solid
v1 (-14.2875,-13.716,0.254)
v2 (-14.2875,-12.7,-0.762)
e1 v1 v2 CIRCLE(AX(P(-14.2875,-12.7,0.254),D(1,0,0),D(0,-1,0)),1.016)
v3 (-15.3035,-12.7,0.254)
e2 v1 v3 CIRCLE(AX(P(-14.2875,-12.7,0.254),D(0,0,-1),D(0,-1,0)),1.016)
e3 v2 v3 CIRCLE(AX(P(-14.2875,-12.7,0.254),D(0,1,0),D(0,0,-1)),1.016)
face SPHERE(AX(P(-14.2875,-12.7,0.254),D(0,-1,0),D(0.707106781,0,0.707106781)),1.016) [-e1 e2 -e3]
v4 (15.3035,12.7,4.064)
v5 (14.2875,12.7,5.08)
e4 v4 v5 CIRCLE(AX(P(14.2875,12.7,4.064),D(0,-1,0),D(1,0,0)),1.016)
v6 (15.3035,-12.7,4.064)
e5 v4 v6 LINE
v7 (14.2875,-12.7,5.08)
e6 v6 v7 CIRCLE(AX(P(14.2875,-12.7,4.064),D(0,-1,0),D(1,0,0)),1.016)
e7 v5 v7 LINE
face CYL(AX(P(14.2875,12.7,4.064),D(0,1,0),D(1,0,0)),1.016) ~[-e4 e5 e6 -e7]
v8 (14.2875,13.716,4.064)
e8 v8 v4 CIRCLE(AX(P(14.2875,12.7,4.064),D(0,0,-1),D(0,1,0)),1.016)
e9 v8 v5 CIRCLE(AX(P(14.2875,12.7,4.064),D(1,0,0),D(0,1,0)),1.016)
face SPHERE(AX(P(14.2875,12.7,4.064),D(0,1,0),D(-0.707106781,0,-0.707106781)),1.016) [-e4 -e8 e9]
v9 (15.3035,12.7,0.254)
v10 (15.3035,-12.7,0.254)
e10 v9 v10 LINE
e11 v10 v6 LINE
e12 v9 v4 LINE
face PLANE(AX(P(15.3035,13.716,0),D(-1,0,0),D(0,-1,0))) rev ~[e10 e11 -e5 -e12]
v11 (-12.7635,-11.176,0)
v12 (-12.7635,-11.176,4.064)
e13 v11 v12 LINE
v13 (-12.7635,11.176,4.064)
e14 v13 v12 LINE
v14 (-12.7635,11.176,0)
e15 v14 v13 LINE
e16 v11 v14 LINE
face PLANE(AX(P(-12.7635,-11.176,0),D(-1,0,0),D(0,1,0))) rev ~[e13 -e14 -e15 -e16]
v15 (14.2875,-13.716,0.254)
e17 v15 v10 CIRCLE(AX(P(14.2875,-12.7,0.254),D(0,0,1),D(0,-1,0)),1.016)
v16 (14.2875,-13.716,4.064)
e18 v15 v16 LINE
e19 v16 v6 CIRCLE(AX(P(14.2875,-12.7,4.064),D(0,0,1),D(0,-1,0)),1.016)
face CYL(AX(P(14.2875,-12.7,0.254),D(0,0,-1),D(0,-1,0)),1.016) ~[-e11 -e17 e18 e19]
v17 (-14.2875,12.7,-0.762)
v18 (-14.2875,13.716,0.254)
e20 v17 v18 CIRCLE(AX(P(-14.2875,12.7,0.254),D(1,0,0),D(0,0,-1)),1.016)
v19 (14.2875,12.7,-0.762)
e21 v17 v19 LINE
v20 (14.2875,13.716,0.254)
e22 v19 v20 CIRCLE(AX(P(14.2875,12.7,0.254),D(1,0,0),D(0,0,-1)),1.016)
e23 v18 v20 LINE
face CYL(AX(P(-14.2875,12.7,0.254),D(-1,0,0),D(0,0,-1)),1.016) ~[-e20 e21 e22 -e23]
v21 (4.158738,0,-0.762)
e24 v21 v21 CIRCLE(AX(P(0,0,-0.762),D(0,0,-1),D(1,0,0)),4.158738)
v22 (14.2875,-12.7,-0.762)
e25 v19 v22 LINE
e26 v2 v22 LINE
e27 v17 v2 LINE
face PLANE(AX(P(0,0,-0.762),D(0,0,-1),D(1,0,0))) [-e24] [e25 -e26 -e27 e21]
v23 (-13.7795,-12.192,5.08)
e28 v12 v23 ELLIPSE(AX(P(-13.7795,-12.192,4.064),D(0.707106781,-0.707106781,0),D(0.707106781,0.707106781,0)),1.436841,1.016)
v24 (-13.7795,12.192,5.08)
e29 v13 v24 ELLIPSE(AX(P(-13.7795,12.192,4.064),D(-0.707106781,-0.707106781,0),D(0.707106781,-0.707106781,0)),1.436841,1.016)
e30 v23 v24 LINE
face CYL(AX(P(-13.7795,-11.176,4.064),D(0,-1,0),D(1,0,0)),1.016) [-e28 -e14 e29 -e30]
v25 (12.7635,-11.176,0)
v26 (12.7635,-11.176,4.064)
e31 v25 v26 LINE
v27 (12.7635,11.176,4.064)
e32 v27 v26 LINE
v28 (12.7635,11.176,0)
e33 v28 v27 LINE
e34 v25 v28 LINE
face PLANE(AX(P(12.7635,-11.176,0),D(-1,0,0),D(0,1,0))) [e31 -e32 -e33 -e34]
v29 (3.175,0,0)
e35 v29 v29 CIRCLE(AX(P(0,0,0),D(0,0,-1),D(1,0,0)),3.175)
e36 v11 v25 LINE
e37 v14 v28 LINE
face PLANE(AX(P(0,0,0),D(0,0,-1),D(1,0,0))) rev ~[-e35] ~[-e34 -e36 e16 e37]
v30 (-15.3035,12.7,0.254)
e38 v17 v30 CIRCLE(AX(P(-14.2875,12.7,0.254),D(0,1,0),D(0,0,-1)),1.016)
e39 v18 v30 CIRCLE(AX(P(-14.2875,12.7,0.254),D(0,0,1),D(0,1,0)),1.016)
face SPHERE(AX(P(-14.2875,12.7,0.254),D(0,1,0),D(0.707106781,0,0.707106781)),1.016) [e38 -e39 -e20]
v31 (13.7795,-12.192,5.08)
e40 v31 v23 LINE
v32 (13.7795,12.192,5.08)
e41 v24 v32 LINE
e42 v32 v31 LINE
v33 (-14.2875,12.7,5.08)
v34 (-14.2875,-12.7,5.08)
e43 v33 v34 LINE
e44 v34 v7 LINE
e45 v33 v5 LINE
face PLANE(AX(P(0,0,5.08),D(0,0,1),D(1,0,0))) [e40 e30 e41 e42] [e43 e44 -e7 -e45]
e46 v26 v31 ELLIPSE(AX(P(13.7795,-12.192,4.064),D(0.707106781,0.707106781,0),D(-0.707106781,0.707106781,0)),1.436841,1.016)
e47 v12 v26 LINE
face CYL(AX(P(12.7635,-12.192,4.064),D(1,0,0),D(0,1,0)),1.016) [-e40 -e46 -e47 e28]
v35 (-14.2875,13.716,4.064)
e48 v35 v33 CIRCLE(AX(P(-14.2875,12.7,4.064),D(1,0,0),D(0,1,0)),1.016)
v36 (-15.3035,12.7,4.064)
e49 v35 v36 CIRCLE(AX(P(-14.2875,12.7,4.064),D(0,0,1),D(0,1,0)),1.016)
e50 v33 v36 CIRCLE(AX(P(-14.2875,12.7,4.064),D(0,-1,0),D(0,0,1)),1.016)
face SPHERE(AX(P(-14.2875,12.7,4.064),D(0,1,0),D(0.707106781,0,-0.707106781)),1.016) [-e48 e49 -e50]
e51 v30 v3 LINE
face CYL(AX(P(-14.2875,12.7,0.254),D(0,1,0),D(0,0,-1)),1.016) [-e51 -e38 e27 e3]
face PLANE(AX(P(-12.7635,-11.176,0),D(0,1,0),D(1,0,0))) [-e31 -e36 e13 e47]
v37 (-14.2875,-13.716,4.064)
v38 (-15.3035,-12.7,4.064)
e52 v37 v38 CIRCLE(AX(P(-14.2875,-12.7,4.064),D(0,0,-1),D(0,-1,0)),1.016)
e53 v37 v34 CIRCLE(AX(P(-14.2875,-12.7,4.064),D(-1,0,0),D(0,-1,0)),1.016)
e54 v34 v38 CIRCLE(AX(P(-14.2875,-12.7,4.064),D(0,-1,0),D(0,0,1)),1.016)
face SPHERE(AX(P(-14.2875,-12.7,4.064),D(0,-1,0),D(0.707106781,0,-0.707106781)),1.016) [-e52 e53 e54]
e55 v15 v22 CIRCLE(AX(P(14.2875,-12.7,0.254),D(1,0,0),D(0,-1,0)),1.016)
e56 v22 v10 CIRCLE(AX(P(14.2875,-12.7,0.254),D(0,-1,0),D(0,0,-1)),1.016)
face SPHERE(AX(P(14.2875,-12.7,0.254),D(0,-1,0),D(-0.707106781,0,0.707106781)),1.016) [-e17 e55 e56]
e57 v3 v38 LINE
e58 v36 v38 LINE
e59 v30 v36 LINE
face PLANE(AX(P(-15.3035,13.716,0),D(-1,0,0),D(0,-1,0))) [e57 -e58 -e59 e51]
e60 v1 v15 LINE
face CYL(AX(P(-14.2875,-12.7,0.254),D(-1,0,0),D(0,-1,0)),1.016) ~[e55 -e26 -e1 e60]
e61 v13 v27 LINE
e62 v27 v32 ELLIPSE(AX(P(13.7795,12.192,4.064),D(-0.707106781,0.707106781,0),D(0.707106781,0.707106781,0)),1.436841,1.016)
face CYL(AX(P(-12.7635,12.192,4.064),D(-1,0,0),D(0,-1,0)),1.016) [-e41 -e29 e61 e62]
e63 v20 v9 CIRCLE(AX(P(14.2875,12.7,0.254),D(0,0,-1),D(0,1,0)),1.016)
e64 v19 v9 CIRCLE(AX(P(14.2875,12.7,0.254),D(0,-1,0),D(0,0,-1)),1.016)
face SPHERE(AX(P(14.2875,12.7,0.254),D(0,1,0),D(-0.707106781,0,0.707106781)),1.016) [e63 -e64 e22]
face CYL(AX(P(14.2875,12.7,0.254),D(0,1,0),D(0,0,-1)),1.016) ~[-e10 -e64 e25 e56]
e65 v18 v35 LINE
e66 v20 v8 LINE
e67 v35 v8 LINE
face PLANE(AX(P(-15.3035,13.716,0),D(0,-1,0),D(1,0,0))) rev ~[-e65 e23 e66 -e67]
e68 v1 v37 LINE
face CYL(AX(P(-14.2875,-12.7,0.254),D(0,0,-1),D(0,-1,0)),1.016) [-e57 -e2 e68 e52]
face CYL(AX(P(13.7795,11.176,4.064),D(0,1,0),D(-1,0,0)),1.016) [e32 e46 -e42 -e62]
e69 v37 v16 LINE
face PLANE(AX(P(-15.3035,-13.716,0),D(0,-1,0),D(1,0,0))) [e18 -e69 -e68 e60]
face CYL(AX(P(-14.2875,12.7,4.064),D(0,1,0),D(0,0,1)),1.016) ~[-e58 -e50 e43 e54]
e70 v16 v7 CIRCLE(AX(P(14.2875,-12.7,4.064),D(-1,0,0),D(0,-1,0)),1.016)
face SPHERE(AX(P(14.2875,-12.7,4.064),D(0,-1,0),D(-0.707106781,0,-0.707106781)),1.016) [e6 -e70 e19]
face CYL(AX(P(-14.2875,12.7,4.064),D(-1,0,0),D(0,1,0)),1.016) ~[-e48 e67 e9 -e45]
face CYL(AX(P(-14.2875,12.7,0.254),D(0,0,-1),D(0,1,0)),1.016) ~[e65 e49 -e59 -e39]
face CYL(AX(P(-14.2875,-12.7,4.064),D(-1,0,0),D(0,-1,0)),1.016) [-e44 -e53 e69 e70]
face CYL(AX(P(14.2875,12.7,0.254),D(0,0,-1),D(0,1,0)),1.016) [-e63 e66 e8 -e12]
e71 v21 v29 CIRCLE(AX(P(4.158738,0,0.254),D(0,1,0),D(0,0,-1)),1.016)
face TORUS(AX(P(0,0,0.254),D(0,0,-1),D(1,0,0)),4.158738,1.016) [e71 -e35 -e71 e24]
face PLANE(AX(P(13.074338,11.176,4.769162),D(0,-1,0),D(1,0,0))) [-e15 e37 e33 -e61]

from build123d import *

# Parameters (mm, degrees)
F0_W          = 30.607
F0_H          = 27.432
F0_W_2        = 25.527
F0_H_2        = 22.352
F1_DEPTH      = 5.08
F2_W          = 30.607
F2_H          = 27.432
F2_R          = 3.175
F3_DEPTH      = 0.762
F4_T1_DEPTH   = 3.81
F4_T3_DEPTH   = 28.575
F4_T5_DEPTH   = 25.4
F4_T7_DEPTH   = 22.352
F4_T9_DEPTH   = 25.527
F4_S13_W      = 1.03632
F4_S13_H      = 1.03632
F4_T14_DEPTH  = 1.03632
F4_S19_W      = 1.03632
F4_S19_H      = 1.03632
F4_T20_DEPTH  = 1.03632
F4_S25_W      = 1.03632
F4_S25_H      = 1.03632
F4_T26_DEPTH  = 1.03632
F4_S31_W      = 1.03632
F4_S31_H      = 1.03632
F4_T32_DEPTH  = 1.03632
F4_S37_W      = 1.03632
F4_S37_H      = 1.03632
F4_T38_DEPTH  = 1.03632
F4_S43_W      = 1.03632
F4_S43_H      = 1.03632
F4_T44_DEPTH  = 1.03632
F4_S49_W      = 1.03632
F4_S49_H      = 1.03632
F4_T50_DEPTH  = 1.03632
F4_S55_W      = 1.03632
F4_S55_H      = 1.03632
F4_T56_DEPTH  = 1.03632
F4_T65_DEPTH  = 28.067
F4_T69_DEPTH  = 24.892
F4_T76_DEPTH  = 24.892
F4_T80_DEPTH  = 28.067
F4_T87_DEPTH  = 24.892
F4_T91_DEPTH  = 28.067
F4_T98_DEPTH  = 24.892
F4_T102_DEPTH = 28.067


# Not quite as in the source:
# - a fillet or chamfer that OpenCascade refuses, or shapes differently, is made with other operations: its cross-section is extruded or revolved along the edge and cut away or added


with BuildPart() as f1:
    # F0 (on Top) → F1 (new body)
    with BuildSketch(Plane.XY):
        Rectangle(F0_W, F0_H)
        Rectangle(F0_W_2, F0_H_2, mode=Mode.SUBTRACT)
    extrude(amount=F1_DEPTH)

    # F2 (on face) → F3 (join)
    with BuildSketch(Plane(origin=(0, 0, 0), x_dir=(1, 0, 0), z_dir=(0, 0, -1))):
        Rectangle(F2_W, F2_H)
        Circle(F2_R, mode=Mode.SUBTRACT)
    extrude(amount=F3_DEPTH)

    # F4: fillet of radius 1.016 on 17 edges, made by hand

    # F4_s2 → F4_t1 (cut)
    with BuildSketch(Plane.XY.offset(0.254)):
        with BuildLine():
            ThreePointArc((-14.2875, -13.716), (-15.0059204897, -13.4184204897), (-15.3035, -12.7))
            Line((-15.3035, -12.7), (-15.3035, -13.716))
            Line((-15.3035, -13.716), (-14.2875, -13.716))
        make_face()
        with BuildLine():
            ThreePointArc((14.2875, -13.716), (15.0059204897, -13.4184204897), (15.3035, -12.7))
            Line((15.3035, -12.7), (15.3035, -13.716))
            Line((15.3035, -13.716), (14.2875, -13.716))
        make_face()
        with BuildLine():
            ThreePointArc((-14.2875, 13.716), (-15.0059204897, 13.4184204897), (-15.3035, 12.7))
            Line((-15.3035, 12.7), (-15.3035, 13.716))
            Line((-15.3035, 13.716), (-14.2875, 13.716))
        make_face()
        with BuildLine():
            ThreePointArc((14.2875, 13.716), (15.0059204897, 13.4184204897), (15.3035, 12.7))
            Line((15.3035, 12.7), (15.3035, 13.716))
            Line((15.3035, 13.716), (14.2875, 13.716))
        make_face()
    extrude(amount=F4_T1_DEPTH, mode=Mode.SUBTRACT)

    # F4_s4 → F4_t3 (cut)
    with BuildSketch(Plane.YZ.offset(-14.2875)):
        with BuildLine():
            ThreePointArc((-13.716, 4.064), (-13.4184204897, 4.7824204897), (-12.7, 5.08))
            Line((-12.7, 5.08), (-13.716, 5.08))
            Line((-13.716, 5.08), (-13.716, 4.064))
        make_face()
        with BuildLine():
            ThreePointArc((-13.716, 0.254), (-13.4184204897, -0.4644204897), (-12.7, -0.762))
            Line((-12.7, -0.762), (-13.716, -0.762))
            Line((-13.716, -0.762), (-13.716, 0.254))
        make_face()
        with BuildLine():
            ThreePointArc((12.7, -0.762), (13.4184204897, -0.4644204897), (13.716, 0.254))
            Line((13.716, 0.254), (13.716, -0.762))
            Line((13.716, -0.762), (12.7, -0.762))
        make_face()
        with BuildLine():
            ThreePointArc((13.716, 4.064), (13.4184204897, 4.7824204897), (12.7, 5.08))
            Line((12.7, 5.08), (13.716, 5.08))
            Line((13.716, 5.08), (13.716, 4.064))
        make_face()
    extrude(amount=F4_T3_DEPTH, mode=Mode.SUBTRACT)

    # F4_s6 → F4_t5 (cut)
    with BuildSketch(Plane.XZ.offset(-12.7)):
        with BuildLine():
            ThreePointArc((-14.2875, -0.762), (-15.0059204897, -0.4644204897), (-15.3035, 0.254))
            Line((-15.3035, 0.254), (-15.3035, -0.762))
            Line((-15.3035, -0.762), (-14.2875, -0.762))
        make_face()
        with BuildLine():
            ThreePointArc((14.2875, -0.762), (15.0059204897, -0.4644204897), (15.3035, 0.254))
            Line((15.3035, 0.254), (15.3035, -0.762))
            Line((15.3035, -0.762), (14.2875, -0.762))
        make_face()
        with BuildLine():
            ThreePointArc((-14.2875, 5.08), (-15.0059204897, 4.7824204897), (-15.3035, 4.064))
            Line((-15.3035, 4.064), (-15.3035, 5.08))
            Line((-15.3035, 5.08), (-14.2875, 5.08))
        make_face()
        with BuildLine():
            ThreePointArc((15.3035, 4.064), (15.0059204897, 4.7824204897), (14.2875, 5.08))
            Line((14.2875, 5.08), (15.3035, 5.08))
            Line((15.3035, 5.08), (15.3035, 4.064))
        make_face()
    extrude(amount=F4_T5_DEPTH, mode=Mode.SUBTRACT)

    # F4_s8 → F4_t7 (cut)
    with BuildSketch(Plane.XZ.offset(-11.176)):
        with BuildLine():
            ThreePointArc((-12.7635, 4.064), (-13.0610795103, 4.7824204897), (-13.7795, 5.08))
            Line((-13.7795, 5.08), (-12.7635, 5.08))
            Line((-12.7635, 5.08), (-12.7635, 4.064))
        make_face()
        with BuildLine():
            ThreePointArc((12.7635, 4.064), (13.0610795103, 4.7824204897), (13.7795, 5.08))
            Line((13.7795, 5.08), (12.7635, 5.08))
            Line((12.7635, 5.08), (12.7635, 4.064))
        make_face()
    extrude(amount=F4_T7_DEPTH, mode=Mode.SUBTRACT)

    # F4_s10 → F4_t9 (cut)
    with BuildSketch(Plane.YZ.offset(-12.7635)):
        with BuildLine():
            ThreePointArc((11.176, 4.064), (11.4735795103, 4.7824204897), (12.192, 5.08))
            Line((12.192, 5.08), (11.176, 5.08))
            Line((11.176, 5.08), (11.176, 4.064))
        make_face()
        with BuildLine():
            ThreePointArc((-11.176, 4.064), (-11.4735795103, 4.7824204897), (-12.192, 5.08))
            Line((-12.192, 5.08), (-11.176, 5.08))
            Line((-11.176, 5.08), (-11.176, 4.064))
        make_face()
    extrude(amount=F4_T9_DEPTH, mode=Mode.SUBTRACT)


with BuildPart() as f4_tool12:
    # F4_s13 → F4_t14 (new body)
    with BuildSketch(Plane.XZ.offset(12.7)):
        with Locations((-14.80566, 4.58216)):
            Rectangle(F4_S13_W, F4_S13_H)
    extrude(amount=F4_T14_DEPTH)

    # F4_s15 → F4_t16 (revolve, cut)
    with BuildSketch(Plane(origin=(-14.2875, -12.7, 4.064), x_dir=(0.7071067812, 0, -0.7071067812), z_dir=(-0.7071067812, 0, -0.7071067812))):
        with BuildLine():
            ThreePointArc((0, -1.016), (1.016, 0), (0, 1.016))
            Line((0, 1.016), (0, -1.016))
        make_face()
    revolve(axis=Axis((-14.2875, -12.7, 4.064), (0, -1, 0)), mode=Mode.SUBTRACT)


with BuildPart() as f1_1:
    add(f1.part)

    # F4_t11: cut F4_tool12
    add(f4_tool12.part, mode=Mode.SUBTRACT)


with BuildPart() as f4_tool18:
    # F4_s19 → F4_t20 (new body)
    with BuildSketch(Plane.XZ.offset(12.7)):
        with Locations((-14.80566, -0.26416)):
            Rectangle(F4_S19_W, F4_S19_H)
    extrude(amount=F4_T20_DEPTH)

    # F4_s21 → F4_t22 (revolve, cut)
    with BuildSketch(Plane(origin=(-14.2875, -12.7, 0.254), x_dir=(0.7071067812, 0, 0.7071067812), z_dir=(0.7071067812, 0, -0.7071067812))):
        with BuildLine():
            ThreePointArc((0, -1.016), (1.016, 0), (0, 1.016))
            Line((0, 1.016), (0, -1.016))
        make_face()
    revolve(axis=Axis((-14.2875, -12.7, 0.254), (0, -1, 0)), mode=Mode.SUBTRACT)


with BuildPart() as f1_2:
    add(f1_1.part)

    # F4_t17: cut F4_tool18
    add(f4_tool18.part, mode=Mode.SUBTRACT)


with BuildPart() as f4_tool24:
    # F4_s25 → F4_t26 (new body)
    with BuildSketch(Plane.XZ.offset(12.7)):
        with Locations((14.80566, 4.58216)):
            Rectangle(F4_S25_W, F4_S25_H)
    extrude(amount=F4_T26_DEPTH)

    # F4_s27 → F4_t28 (revolve, cut)
    with BuildSketch(Plane(origin=(14.2875, -12.7, 4.064), x_dir=(-0.7071067812, 0, -0.7071067812), z_dir=(-0.7071067812, 0, 0.7071067812))):
        with BuildLine():
            ThreePointArc((0, -1.016), (1.016, 0), (0, 1.016))
            Line((0, 1.016), (0, -1.016))
        make_face()
    revolve(axis=Axis((14.2875, -12.7, 4.064), (0, -1, 0)), mode=Mode.SUBTRACT)


with BuildPart() as f1_3:
    add(f1_2.part)

    # F4_t23: cut F4_tool24
    add(f4_tool24.part, mode=Mode.SUBTRACT)


with BuildPart() as f4_tool30:
    # F4_s31 → F4_t32 (new body)
    with BuildSketch(Plane.XZ.offset(12.7)):
        with Locations((14.80566, -0.26416)):
            Rectangle(F4_S31_W, F4_S31_H)
    extrude(amount=F4_T32_DEPTH)

    # F4_s33 → F4_t34 (revolve, cut)
    with BuildSketch(Plane(origin=(14.2875, -12.7, 0.254), x_dir=(-0.7071067812, 0, 0.7071067812), z_dir=(0.7071067812, 0, 0.7071067812))):
        with BuildLine():
            ThreePointArc((0, -1.016), (1.016, 0), (0, 1.016))
            Line((0, 1.016), (0, -1.016))
        make_face()
    revolve(axis=Axis((14.2875, -12.7, 0.254), (0, -1, 0)), mode=Mode.SUBTRACT)


with BuildPart() as f1_4:
    add(f1_3.part)

    # F4_t29: cut F4_tool30
    add(f4_tool30.part, mode=Mode.SUBTRACT)


with BuildPart() as f4_tool36:
    # F4_s37 → F4_t38 (new body)
    with BuildSketch(Plane.XZ.offset(-12.7)):
        with Locations((-14.80566, -0.26416)):
            Rectangle(F4_S37_W, F4_S37_H)
    extrude(amount=-F4_T38_DEPTH)

    # F4_s39 → F4_t40 (revolve, cut)
    with BuildSketch(Plane(origin=(-14.2875, 12.7, 0.254), x_dir=(0.7071067812, 0, 0.7071067812), z_dir=(-0.7071067812, 0, 0.7071067812))):
        with BuildLine():
            ThreePointArc((0, -1.016), (1.016, 0), (0, 1.016))
            Line((0, 1.016), (0, -1.016))
        make_face()
    revolve(axis=Axis((-14.2875, 12.7, 0.254), (0, 1, 0)), mode=Mode.SUBTRACT)


with BuildPart() as f1_5:
    add(f1_4.part)

    # F4_t35: cut F4_tool36
    add(f4_tool36.part, mode=Mode.SUBTRACT)


with BuildPart() as f4_tool42:
    # F4_s43 → F4_t44 (new body)
    with BuildSketch(Plane.XZ.offset(-12.7)):
        with Locations((14.80566, -0.26416)):
            Rectangle(F4_S43_W, F4_S43_H)
    extrude(amount=-F4_T44_DEPTH)

    # F4_s45 → F4_t46 (revolve, cut)
    with BuildSketch(Plane(origin=(14.2875, 12.7, 0.254), x_dir=(-0.7071067812, 0, 0.7071067812), z_dir=(-0.7071067812, 0, -0.7071067812))):
        with BuildLine():
            ThreePointArc((0, -1.016), (1.016, 0), (0, 1.016))
            Line((0, 1.016), (0, -1.016))
        make_face()
    revolve(axis=Axis((14.2875, 12.7, 0.254), (0, 1, 0)), mode=Mode.SUBTRACT)


with BuildPart() as f1_6:
    add(f1_5.part)

    # F4_t41: cut F4_tool42
    add(f4_tool42.part, mode=Mode.SUBTRACT)


with BuildPart() as f4_tool48:
    # F4_s49 → F4_t50 (new body)
    with BuildSketch(Plane.XZ.offset(-12.7)):
        with Locations((14.80566, 4.58216)):
            Rectangle(F4_S49_W, F4_S49_H)
    extrude(amount=-F4_T50_DEPTH)

    # F4_s51 → F4_t52 (revolve, cut)
    with BuildSketch(Plane(origin=(14.2875, 12.7, 4.064), x_dir=(-0.7071067812, 0, -0.7071067812), z_dir=(0.7071067812, 0, -0.7071067812))):
        with BuildLine():
            ThreePointArc((0, -1.016), (1.016, 0), (0, 1.016))
            Line((0, 1.016), (0, -1.016))
        make_face()
    revolve(axis=Axis((14.2875, 12.7, 4.064), (0, 1, 0)), mode=Mode.SUBTRACT)


with BuildPart() as f1_7:
    add(f1_6.part)

    # F4_t47: cut F4_tool48
    add(f4_tool48.part, mode=Mode.SUBTRACT)


with BuildPart() as f4_tool54:
    # F4_s55 → F4_t56 (new body)
    with BuildSketch(Plane.XZ.offset(-12.7)):
        with Locations((-14.80566, 4.58216)):
            Rectangle(F4_S55_W, F4_S55_H)
    extrude(amount=-F4_T56_DEPTH)

    # F4_s57 → F4_t58 (revolve, cut)
    with BuildSketch(Plane(origin=(-14.2875, 12.7, 4.064), x_dir=(0.7071067812, 0, -0.7071067812), z_dir=(0.7071067812, 0, 0.7071067812))):
        with BuildLine():
            ThreePointArc((0, -1.016), (1.016, 0), (0, 1.016))
            Line((0, 1.016), (0, -1.016))
        make_face()
    revolve(axis=Axis((-14.2875, 12.7, 4.064), (0, 1, 0)), mode=Mode.SUBTRACT)


with BuildPart() as f1_8:
    add(f1_7.part)

    # F4_t53: cut F4_tool54
    add(f4_tool54.part, mode=Mode.SUBTRACT)

    # F4_s59 → F4_t60 (revolve, cut)
    with BuildSketch(Plane.XZ):
        with BuildLine():
            ThreePointArc((4.1587377699, -0.762), (3.5365673753, -0.5492185257), (3.175, 0))
            Line((3.175, 0), (3.175, -0.762))
            Line((3.175, -0.762), (4.1587377699, -0.762))
        make_face()
    revolve(axis=Axis((0, 0, -0.762), (0, 0, -1)), mode=Mode.SUBTRACT)


with BuildPart() as f4_tool63:
    # F4_s64 → F4_t65 (new body)
    with BuildSketch(Plane.YZ.offset(12.7635)):
        with BuildLine():
            ThreePointArc((-11.176, 4.064), (-11.4735795103, 4.7824204897), (-12.192, 5.08))
            Line((-12.192, 5.08), (-11.176, 5.08))
            Line((-11.176, 5.08), (-11.176, 4.064))
        make_face()
    extrude(amount=-F4_T65_DEPTH)

    split(bisect_by=Plane.YZ.offset(-12.7635), keep=Keep.BOTTOM)


with BuildPart() as f4_tool67:
    # F4_s68 → F4_t69 (new body)
    with BuildSketch(Plane.XZ.offset(13.716)):
        with BuildLine():
            ThreePointArc((-12.7635, 4.064), (-13.0610795103, 4.7824204897), (-13.7795, 5.08))
            Line((-13.7795, 5.08), (-12.7635, 5.08))
            Line((-12.7635, 5.08), (-12.7635, 4.064))
        make_face()
    extrude(amount=-F4_T69_DEPTH)

    split(bisect_by=Plane.XZ.offset(11.176), keep=Keep.TOP)


with BuildPart() as f4_tool63_1:
    add(f4_tool63.part)

    # F4_t71: intersect F4_tool67
    add(f4_tool67.part, mode=Mode.INTERSECT)


with BuildPart() as f1_9:
    add(f1_8.part)

    # F4_t61: cut F4_tool63
    add(f4_tool63_1.part, mode=Mode.SUBTRACT)


with BuildPart() as f4_tool74:
    # F4_s75 → F4_t76 (new body)
    with BuildSketch(Plane.XZ.offset(11.176)):
        with BuildLine():
            ThreePointArc((-12.7635, 4.064), (-13.0610795103, 4.7824204897), (-13.7795, 5.08))
            Line((-13.7795, 5.08), (-12.7635, 5.08))
            Line((-12.7635, 5.08), (-12.7635, 4.064))
        make_face()
    extrude(amount=-F4_T76_DEPTH)

    split(bisect_by=Plane.XZ.offset(-11.176), keep=Keep.BOTTOM)


with BuildPart() as f4_tool78:
    # F4_s79 → F4_t80 (new body)
    with BuildSketch(Plane.YZ.offset(-15.3035)):
        with BuildLine():
            ThreePointArc((11.176, 4.064), (11.4735795103, 4.7824204897), (12.192, 5.08))
            Line((12.192, 5.08), (11.176, 5.08))
            Line((11.176, 5.08), (11.176, 4.064))
        make_face()
    extrude(amount=F4_T80_DEPTH)

    split(bisect_by=Plane.YZ.offset(-12.7635), keep=Keep.BOTTOM)


with BuildPart() as f4_tool74_1:
    add(f4_tool74.part)

    # F4_t82: intersect F4_tool78
    add(f4_tool78.part, mode=Mode.INTERSECT)


with BuildPart() as f1_10:
    add(f1_9.part)

    # F4_t72: cut F4_tool74
    add(f4_tool74_1.part, mode=Mode.SUBTRACT)


with BuildPart() as f4_tool85:
    # F4_s86 → F4_t87 (new body)
    with BuildSketch(Plane.XZ.offset(-13.716)):
        with BuildLine():
            ThreePointArc((12.7635, 4.064), (13.0610795103, 4.7824204897), (13.7795, 5.08))
            Line((13.7795, 5.08), (12.7635, 5.08))
            Line((12.7635, 5.08), (12.7635, 4.064))
        make_face()
    extrude(amount=F4_T87_DEPTH)

    split(bisect_by=Plane.XZ.offset(-11.176), keep=Keep.BOTTOM)


with BuildPart() as f4_tool89:
    # F4_s90 → F4_t91 (new body)
    with BuildSketch(Plane.YZ.offset(-12.7635)):
        with BuildLine():
            ThreePointArc((11.176, 4.064), (11.4735795103, 4.7824204897), (12.192, 5.08))
            Line((12.192, 5.08), (11.176, 5.08))
            Line((11.176, 5.08), (11.176, 4.064))
        make_face()
    extrude(amount=F4_T91_DEPTH)

    split(bisect_by=Plane.YZ.offset(12.7635), keep=Keep.TOP)


with BuildPart() as f4_tool85_1:
    add(f4_tool85.part)

    # F4_t93: intersect F4_tool89
    add(f4_tool89.part, mode=Mode.INTERSECT)


with BuildPart() as f1_11:
    add(f1_10.part)

    # F4_t83: cut F4_tool85
    add(f4_tool85_1.part, mode=Mode.SUBTRACT)


with BuildPart() as f4_tool96:
    # F4_s97 → F4_t98 (new body)
    with BuildSketch(Plane.XZ.offset(-11.176)):
        with BuildLine():
            ThreePointArc((12.7635, 4.064), (13.0610795103, 4.7824204897), (13.7795, 5.08))
            Line((13.7795, 5.08), (12.7635, 5.08))
            Line((12.7635, 5.08), (12.7635, 4.064))
        make_face()
    extrude(amount=F4_T98_DEPTH)

    split(bisect_by=Plane.XZ.offset(11.176), keep=Keep.TOP)


with BuildPart() as f4_tool100:
    # F4_s101 → F4_t102 (new body)
    with BuildSketch(Plane.YZ.offset(15.3035)):
        with BuildLine():
            ThreePointArc((-11.176, 4.064), (-11.4735795103, 4.7824204897), (-12.192, 5.08))
            Line((-12.192, 5.08), (-11.176, 5.08))
            Line((-11.176, 5.08), (-11.176, 4.064))
        make_face()
    extrude(amount=-F4_T102_DEPTH)

    split(bisect_by=Plane.YZ.offset(12.7635), keep=Keep.TOP)


with BuildPart() as f4_tool96_1:
    add(f4_tool96.part)

    # F4_t104: intersect F4_tool100
    add(f4_tool100.part, mode=Mode.INTERSECT)


with BuildPart() as f1_12:
    add(f1_11.part)

    # F4_t94: cut F4_tool96
    add(f4_tool96_1.part, mode=Mode.SUBTRACT)


solid = f1_12.part
